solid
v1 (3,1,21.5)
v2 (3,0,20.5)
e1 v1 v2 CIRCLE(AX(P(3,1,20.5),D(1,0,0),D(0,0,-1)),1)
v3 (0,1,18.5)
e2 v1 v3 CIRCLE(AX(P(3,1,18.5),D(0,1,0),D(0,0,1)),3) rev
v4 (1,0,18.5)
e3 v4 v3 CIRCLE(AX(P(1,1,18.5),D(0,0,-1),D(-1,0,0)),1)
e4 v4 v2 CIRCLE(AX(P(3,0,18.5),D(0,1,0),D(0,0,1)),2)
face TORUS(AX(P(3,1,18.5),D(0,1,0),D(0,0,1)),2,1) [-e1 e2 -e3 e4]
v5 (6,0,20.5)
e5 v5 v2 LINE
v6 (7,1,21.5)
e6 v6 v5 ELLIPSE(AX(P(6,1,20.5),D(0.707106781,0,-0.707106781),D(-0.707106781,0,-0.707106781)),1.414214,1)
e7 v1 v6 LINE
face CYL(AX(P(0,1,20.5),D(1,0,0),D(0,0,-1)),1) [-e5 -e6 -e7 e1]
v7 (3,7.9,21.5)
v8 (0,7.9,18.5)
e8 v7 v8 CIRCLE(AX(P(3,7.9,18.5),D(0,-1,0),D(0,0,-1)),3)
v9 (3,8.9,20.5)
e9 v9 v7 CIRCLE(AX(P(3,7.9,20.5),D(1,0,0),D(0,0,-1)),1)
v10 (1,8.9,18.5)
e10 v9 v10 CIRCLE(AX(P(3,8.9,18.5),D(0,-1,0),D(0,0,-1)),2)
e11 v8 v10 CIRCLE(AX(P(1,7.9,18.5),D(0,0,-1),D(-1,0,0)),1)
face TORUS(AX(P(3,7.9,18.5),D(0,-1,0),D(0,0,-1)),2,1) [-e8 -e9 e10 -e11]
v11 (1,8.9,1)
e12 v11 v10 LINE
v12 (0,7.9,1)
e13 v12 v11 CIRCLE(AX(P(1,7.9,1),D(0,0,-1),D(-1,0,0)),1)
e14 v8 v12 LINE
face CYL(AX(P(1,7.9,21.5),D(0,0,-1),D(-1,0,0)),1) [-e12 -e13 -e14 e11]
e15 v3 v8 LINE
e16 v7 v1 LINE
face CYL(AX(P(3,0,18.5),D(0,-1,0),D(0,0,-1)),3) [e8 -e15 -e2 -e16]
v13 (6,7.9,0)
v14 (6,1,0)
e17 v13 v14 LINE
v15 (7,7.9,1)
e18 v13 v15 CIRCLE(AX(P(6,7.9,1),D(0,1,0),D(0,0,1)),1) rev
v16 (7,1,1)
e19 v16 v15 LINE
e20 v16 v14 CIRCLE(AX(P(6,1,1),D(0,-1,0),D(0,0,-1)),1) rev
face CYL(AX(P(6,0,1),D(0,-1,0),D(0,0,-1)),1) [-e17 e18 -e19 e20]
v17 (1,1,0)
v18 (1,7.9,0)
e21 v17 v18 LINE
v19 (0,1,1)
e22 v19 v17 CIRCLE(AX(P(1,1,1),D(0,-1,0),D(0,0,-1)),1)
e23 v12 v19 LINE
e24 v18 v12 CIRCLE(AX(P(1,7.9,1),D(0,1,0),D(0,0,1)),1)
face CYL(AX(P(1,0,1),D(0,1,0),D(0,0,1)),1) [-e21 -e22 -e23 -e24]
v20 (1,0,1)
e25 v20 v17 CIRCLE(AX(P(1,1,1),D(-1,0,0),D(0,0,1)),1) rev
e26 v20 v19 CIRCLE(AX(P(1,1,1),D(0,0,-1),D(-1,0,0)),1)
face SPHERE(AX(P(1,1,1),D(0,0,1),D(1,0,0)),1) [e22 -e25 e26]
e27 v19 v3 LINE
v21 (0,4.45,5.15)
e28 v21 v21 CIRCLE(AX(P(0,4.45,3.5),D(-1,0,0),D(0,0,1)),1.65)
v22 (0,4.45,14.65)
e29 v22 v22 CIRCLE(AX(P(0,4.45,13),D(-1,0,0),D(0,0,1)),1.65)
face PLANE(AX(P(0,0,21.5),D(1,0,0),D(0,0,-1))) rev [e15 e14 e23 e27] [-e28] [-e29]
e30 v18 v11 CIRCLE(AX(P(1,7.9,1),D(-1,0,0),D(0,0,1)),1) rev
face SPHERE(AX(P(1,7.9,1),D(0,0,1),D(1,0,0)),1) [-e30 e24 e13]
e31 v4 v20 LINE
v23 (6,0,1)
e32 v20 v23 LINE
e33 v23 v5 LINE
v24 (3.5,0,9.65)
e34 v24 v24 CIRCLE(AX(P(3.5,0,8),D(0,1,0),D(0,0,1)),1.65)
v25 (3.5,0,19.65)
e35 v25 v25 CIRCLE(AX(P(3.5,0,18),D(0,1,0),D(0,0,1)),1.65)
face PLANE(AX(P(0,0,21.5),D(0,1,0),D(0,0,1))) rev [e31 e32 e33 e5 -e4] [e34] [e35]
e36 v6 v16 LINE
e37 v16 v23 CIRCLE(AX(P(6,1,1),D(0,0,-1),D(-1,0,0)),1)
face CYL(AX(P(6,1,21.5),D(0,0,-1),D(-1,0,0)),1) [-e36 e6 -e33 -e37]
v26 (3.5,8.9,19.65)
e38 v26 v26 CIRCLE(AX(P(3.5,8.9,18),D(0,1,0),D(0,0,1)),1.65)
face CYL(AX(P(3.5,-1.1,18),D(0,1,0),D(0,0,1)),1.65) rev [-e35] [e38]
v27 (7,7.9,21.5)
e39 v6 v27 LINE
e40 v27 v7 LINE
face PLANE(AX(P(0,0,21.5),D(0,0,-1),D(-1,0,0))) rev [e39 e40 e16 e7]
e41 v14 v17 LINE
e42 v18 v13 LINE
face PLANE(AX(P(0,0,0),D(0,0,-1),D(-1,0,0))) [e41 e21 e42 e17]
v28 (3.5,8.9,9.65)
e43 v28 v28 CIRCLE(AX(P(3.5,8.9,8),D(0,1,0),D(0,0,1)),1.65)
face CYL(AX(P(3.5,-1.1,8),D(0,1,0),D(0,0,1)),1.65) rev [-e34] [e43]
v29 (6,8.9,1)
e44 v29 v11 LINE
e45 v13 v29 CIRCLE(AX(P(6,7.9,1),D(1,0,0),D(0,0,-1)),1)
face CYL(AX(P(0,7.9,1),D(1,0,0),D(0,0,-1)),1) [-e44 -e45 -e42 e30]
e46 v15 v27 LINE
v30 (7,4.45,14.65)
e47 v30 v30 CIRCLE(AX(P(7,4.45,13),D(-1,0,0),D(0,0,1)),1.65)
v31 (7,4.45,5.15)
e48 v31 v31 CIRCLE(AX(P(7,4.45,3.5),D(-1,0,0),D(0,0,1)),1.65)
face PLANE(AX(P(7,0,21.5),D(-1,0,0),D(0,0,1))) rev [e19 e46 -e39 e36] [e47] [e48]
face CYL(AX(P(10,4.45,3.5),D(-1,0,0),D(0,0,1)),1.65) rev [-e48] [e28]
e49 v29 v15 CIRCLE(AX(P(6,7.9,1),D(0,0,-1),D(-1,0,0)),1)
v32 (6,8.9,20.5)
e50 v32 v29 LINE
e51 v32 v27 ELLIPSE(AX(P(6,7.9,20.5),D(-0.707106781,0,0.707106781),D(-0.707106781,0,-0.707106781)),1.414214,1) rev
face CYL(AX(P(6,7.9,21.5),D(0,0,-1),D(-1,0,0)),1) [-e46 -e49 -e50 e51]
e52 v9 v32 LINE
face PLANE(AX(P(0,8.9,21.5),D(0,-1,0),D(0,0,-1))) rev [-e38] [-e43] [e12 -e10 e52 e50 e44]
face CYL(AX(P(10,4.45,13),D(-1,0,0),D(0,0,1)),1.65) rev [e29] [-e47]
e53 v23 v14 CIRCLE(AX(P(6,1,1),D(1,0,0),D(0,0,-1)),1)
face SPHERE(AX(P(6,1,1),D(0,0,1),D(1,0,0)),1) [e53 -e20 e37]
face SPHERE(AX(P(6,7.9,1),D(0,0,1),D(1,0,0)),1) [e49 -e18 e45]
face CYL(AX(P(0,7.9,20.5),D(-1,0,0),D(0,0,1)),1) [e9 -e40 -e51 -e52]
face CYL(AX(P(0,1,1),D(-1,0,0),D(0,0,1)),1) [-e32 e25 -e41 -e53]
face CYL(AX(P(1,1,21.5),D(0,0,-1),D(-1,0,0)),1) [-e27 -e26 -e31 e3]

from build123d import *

# Parameters (mm, degrees)
SKETCH_1_W          = 7
SKETCH_1_H          = 8.9
EXTRUDE_1_DEPTH     = 21.5
FILLET_1_R          = 1
SKETCH_6_R          = 1.65
CUT_EXTRUDE_2_DEPTH = 10
SKETCH_7_R          = 1.65
CUT_EXTRUDE_3_DEPTH = 10
FILLET_3_R          = 3


with BuildPart() as part:
    # 草图1 → 凸台-拉伸1 (new body)
    with BuildSketch(Plane.XY):
        with Locations((3.5, 4.45)):
            Rectangle(SKETCH_1_W, SKETCH_1_H)
    extrude(amount=EXTRUDE_1_DEPTH)

    # 圆角1
    fillet_1_edges = [part.edges().sort_by_distance(p)[0] for p in [
        (3.5, 8.9, 21.5),
        (3.5, 8.9, 0),
        (7, 4.45, 0),
        (3.5, 0, 0),
        (0, 4.45, 0),
        (3.5, 0, 21.5),
        (0, 8.9, 10.75),
        (7, 8.9, 10.75),
        (7, 0, 10.75),
        (0, 0, 10.75),
    ]]
    fillet(fillet_1_edges, radius=FILLET_1_R)

    # 草图6 → 切除-拉伸2 (cut)
    with BuildSketch(Plane.ZY):
        with Locations((3.5, 4.45)):
            Circle(SKETCH_6_R)
        with Locations((13, 4.45)):
            Circle(SKETCH_6_R)
    extrude(amount=-CUT_EXTRUDE_2_DEPTH, mode=Mode.SUBTRACT)

    # 草图7 → 切除-拉伸3 (cut)
    with BuildSketch(Plane(origin=(0, 8.9, 0), x_dir=(1, 0, 0), z_dir=(0, 1, 0))):
        with Locations(Location((3.5, -8, 0), (0, 0, 270))):
            Circle(SKETCH_7_R)
        with Locations(Location((3.5, -18, 0), (0, 0, 270))):
            Circle(SKETCH_7_R)
    extrude(amount=-CUT_EXTRUDE_3_DEPTH, mode=Mode.SUBTRACT)

    # 圆角3
    # the kernel refuses this fillet: 3 mm, written as the material it takes off along each edge
    with BuildSketch(Plane(origin=(3, 0, 18.5), x_dir=(0, 0, 1), z_dir=(1, 0, 0))) as fillet_3_piece_1:
        with BuildLine():
            CenterArc((2, -1), 1, 0, 90)
            Line((3, -1), (3, 0))
            Line((3, 0), (2, 0))
        make_face()
    revolve(axis=Axis((3, 0, 18.5), (0, -1, 0)), revolution_arc=90, mode=Mode.SUBTRACT)
    with BuildSketch(Plane(origin=(3, 8.9, 18.5), x_dir=(-1, 0, 0), z_dir=(0, 0, -1))) as fillet_3_piece_2:
        with BuildLine():
            CenterArc((2, -1), 1, 0, 90)
            Line((3, -1), (3, 0))
            Line((3, 0), (2, 0))
        make_face()
    revolve(axis=Axis((3, 8.9, 18.5), (0, 1, 0)), revolution_arc=90, mode=Mode.SUBTRACT)
    with BuildSketch(Plane(origin=(0, 8.9, 21.5), x_dir=(0, 0, -1), z_dir=(0, -1, 0))) as fillet_3_piece_3:
        with BuildLine():
            CenterArc((FILLET_3_R, FILLET_3_R), FILLET_3_R, 180, 90)
            Line((0, FILLET_3_R), (0, 0))
            Line((0, 0), (FILLET_3_R, 0))
        make_face()
    extrude(amount=8.9, mode=Mode.SUBTRACT)


solid = part.part
